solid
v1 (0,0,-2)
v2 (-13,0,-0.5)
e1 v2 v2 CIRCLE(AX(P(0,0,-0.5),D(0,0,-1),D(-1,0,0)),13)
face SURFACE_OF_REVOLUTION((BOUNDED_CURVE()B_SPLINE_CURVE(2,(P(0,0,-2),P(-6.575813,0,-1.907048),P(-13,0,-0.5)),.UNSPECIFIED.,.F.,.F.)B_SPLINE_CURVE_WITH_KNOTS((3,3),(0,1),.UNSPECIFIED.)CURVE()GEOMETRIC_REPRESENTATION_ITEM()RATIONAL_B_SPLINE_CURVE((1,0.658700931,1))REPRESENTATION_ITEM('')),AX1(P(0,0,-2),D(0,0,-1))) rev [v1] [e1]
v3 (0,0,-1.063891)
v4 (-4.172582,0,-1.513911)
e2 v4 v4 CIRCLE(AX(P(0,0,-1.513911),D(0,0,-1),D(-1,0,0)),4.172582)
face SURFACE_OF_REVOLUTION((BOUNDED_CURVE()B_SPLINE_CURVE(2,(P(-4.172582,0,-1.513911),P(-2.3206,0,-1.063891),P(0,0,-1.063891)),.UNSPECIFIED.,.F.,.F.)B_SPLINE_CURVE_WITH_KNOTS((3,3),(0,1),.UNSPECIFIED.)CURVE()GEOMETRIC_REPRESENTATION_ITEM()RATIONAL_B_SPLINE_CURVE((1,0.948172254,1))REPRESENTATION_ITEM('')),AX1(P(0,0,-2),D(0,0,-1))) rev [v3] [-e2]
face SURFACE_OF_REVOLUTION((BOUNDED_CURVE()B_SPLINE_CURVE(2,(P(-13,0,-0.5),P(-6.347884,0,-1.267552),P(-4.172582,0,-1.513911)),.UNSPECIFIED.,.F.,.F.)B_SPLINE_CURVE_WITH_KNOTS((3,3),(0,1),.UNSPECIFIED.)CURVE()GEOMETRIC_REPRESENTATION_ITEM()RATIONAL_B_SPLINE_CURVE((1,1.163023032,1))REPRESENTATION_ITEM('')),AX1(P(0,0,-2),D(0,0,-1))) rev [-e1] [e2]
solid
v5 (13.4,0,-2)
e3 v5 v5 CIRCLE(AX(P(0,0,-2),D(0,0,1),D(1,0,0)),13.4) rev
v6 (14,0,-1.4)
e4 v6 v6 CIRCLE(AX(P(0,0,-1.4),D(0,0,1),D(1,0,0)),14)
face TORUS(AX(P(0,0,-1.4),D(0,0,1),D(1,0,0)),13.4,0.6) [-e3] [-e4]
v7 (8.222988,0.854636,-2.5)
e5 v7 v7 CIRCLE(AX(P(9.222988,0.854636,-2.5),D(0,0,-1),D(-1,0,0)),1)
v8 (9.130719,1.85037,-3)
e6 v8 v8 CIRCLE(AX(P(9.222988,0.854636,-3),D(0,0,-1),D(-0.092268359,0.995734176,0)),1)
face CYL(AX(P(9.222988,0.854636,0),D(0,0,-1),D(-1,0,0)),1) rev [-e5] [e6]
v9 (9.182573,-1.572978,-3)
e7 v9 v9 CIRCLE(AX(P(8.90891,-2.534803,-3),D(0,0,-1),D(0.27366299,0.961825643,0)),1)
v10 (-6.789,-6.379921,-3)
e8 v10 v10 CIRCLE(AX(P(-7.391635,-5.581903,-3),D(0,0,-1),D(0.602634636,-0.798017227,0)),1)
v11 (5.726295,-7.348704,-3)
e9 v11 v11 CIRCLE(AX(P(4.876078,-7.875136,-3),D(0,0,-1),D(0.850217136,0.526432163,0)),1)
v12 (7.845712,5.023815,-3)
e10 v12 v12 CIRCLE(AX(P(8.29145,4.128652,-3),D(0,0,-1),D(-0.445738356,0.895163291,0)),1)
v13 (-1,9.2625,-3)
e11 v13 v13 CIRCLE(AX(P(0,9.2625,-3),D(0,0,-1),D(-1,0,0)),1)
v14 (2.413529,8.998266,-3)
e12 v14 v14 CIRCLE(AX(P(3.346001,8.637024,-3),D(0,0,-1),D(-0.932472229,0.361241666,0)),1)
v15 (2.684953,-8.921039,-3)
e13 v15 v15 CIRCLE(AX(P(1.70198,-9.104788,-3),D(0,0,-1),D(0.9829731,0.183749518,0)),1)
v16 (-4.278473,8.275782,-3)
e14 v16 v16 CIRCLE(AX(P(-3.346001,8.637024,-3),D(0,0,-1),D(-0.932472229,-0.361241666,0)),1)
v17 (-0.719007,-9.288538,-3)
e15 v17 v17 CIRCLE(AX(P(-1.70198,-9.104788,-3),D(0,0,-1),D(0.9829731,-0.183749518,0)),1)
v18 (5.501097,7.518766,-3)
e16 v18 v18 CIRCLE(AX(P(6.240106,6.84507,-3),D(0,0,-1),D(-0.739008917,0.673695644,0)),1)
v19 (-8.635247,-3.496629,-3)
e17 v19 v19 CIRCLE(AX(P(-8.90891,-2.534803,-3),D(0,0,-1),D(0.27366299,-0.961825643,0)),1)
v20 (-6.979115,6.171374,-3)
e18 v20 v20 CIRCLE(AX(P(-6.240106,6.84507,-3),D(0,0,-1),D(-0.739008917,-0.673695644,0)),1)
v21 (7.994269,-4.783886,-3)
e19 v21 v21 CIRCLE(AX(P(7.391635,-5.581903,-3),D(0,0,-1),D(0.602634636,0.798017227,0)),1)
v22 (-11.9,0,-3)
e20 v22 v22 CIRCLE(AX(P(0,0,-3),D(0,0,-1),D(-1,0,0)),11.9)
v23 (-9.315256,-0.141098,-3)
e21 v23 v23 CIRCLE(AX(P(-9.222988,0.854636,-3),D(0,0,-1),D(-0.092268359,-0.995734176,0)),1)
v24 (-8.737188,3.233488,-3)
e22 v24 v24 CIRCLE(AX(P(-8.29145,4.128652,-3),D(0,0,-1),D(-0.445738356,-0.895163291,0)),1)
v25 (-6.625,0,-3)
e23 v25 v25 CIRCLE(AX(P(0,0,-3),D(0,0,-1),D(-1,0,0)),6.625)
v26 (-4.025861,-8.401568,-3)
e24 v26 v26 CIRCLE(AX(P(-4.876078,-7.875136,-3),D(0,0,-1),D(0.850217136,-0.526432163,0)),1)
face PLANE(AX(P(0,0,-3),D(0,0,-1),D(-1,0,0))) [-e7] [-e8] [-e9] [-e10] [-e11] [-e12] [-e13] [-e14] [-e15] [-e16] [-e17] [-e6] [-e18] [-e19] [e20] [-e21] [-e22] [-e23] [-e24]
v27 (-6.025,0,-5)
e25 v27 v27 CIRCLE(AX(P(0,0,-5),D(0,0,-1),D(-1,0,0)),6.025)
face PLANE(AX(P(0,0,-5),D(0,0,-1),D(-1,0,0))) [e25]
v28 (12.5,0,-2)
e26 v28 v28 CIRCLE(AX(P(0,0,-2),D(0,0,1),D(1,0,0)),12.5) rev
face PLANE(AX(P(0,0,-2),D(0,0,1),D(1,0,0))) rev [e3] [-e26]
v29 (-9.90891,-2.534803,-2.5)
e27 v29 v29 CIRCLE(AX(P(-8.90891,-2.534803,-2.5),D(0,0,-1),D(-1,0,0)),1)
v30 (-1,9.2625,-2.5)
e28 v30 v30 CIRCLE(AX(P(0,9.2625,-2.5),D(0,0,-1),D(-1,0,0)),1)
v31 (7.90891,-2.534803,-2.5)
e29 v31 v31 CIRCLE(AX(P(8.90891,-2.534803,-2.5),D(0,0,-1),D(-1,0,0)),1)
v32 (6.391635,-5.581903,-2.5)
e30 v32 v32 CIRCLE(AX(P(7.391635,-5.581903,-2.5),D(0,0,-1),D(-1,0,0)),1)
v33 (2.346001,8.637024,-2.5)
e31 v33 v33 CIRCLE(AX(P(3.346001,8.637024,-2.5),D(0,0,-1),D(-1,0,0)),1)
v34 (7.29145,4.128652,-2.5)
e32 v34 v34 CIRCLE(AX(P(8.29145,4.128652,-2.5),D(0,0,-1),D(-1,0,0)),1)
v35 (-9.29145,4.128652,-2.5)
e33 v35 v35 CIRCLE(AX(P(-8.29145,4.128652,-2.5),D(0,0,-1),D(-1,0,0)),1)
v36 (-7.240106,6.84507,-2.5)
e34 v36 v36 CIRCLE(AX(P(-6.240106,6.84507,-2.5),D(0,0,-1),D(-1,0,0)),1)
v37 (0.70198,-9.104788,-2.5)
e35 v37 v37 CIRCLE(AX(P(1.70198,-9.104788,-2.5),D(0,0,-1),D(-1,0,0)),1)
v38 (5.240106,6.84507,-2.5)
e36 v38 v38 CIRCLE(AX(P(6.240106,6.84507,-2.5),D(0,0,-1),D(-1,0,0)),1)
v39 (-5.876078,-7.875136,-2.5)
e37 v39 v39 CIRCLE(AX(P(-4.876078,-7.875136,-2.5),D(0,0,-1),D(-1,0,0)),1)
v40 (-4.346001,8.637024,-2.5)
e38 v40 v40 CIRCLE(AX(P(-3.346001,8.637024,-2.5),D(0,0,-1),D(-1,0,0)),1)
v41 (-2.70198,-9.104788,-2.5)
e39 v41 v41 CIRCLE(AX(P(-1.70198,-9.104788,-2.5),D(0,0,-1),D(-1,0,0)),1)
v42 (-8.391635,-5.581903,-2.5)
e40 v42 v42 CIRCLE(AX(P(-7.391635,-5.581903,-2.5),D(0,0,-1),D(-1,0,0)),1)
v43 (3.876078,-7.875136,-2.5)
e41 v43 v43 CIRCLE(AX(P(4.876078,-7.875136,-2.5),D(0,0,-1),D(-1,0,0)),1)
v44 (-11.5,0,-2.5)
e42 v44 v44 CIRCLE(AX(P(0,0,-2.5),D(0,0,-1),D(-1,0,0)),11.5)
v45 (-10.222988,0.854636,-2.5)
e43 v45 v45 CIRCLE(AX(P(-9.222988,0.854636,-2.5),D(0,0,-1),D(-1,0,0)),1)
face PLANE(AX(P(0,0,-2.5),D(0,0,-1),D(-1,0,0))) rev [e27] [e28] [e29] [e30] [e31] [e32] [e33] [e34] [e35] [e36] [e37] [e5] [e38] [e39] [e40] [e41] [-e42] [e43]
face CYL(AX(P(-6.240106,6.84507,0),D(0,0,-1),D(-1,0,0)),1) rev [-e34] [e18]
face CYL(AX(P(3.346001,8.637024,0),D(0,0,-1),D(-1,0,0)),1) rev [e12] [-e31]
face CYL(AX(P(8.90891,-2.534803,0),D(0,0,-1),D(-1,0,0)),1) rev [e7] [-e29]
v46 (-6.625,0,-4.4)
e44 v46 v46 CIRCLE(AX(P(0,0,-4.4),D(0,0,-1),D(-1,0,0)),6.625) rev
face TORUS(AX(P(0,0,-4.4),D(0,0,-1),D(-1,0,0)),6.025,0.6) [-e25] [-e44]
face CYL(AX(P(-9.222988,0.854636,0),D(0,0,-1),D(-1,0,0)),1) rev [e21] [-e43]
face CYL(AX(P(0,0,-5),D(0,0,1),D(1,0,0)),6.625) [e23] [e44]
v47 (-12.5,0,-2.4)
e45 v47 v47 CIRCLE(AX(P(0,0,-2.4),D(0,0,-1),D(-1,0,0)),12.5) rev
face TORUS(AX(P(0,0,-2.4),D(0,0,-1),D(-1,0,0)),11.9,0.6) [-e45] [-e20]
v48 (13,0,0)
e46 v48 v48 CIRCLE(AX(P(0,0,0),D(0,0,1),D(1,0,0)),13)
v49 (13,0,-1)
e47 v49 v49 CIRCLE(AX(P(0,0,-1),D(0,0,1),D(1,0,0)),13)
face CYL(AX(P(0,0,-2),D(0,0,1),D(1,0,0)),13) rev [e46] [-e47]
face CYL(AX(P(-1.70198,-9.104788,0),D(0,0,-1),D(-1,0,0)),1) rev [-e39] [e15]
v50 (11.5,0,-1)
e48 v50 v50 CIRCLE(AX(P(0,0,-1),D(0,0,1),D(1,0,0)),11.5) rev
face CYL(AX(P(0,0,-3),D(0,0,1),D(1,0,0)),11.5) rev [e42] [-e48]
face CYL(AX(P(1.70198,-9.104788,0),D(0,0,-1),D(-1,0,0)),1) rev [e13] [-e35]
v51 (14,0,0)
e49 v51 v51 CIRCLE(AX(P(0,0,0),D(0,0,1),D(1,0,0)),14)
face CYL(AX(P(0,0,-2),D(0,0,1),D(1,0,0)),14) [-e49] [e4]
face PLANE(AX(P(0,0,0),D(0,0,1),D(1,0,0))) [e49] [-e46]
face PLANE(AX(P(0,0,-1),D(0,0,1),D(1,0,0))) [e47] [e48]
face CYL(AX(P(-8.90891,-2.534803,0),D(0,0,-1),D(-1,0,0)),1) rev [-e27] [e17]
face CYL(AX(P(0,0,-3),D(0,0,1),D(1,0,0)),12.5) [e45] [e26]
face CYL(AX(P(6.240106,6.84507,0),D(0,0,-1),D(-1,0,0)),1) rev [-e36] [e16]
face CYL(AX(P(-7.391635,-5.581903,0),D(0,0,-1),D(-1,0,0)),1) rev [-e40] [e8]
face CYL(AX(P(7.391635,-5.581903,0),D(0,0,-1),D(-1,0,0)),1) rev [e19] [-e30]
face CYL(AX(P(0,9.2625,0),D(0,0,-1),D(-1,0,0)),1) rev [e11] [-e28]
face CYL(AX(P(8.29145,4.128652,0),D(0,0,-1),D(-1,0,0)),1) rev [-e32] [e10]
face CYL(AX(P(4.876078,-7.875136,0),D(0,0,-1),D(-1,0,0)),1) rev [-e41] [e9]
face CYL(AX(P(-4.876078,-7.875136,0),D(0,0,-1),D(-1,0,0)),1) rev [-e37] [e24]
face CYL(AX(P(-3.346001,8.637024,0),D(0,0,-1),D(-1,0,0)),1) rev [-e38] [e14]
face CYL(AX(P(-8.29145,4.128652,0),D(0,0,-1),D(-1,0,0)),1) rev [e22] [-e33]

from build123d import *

# Parameters (mm, degrees)
SKETCH1_R            = 14
BOSS_EXTRUDE1_DEPTH  = 2
SKETCH3_R            = 12.5
BOSS_EXTRUDE3_DEPTH  = 1
FILLET1_R            = 0.6
FILLET2_R            = 0.6
SHELL1_START         = -2.5
SHELL1_OUTLINE_R     = 11.5
SHELL1_DEPTH         = 2.5
SHELL1_START_2       = -1
SHELL1_2_OUTLINE_R   = 13
SHELL1_2_OUTLINE_R_2 = 11.5
SHELL1_2_DEPTH       = 1
SKETCH4_R            = 6.625
BOSS_EXTRUDE4_DEPTH  = 2
FILLET3_R            = 0.6
SKETCH5_R            = 1
CUT_EXTRUDE1_DEPTH   = 21.024984534
CIRPATTERN1_COUNT    = 17


# Read off the part's stored shape, not the designer's step: Shell1
with BuildPart() as part:
    # Sketch1 → Boss-Extrude1 (new body)
    with BuildSketch(Plane.XY):
        Circle(SKETCH1_R)
    extrude(amount=-BOSS_EXTRUDE1_DEPTH)

    # Sketch3 → Boss-Extrude3 (add)
    with BuildSketch(Plane(origin=(0, 0, -2), x_dir=(-1, 0, 0), z_dir=(0, 0, -1))):
        with Locations(Location((0, 0, 0), (0, 0, 180))):
            Circle(SKETCH3_R)
    extrude(amount=BOSS_EXTRUDE3_DEPTH)

    # Fillet1
    fillet1_edges = [part.edges().sort_by_distance(p)[0] for p in [
        (-14, 0, -2),
    ]]
    fillet(fillet1_edges, radius=FILLET1_R)

    # Fillet2
    fillet2_edges = [part.edges().sort_by_distance(p)[0] for p in [
        (-12.5, 0, -3),
    ]]
    fillet(fillet2_edges, radius=FILLET2_R)

    # Shell1 outline → Shell1 (cut)
    with BuildSketch(Plane.XY.offset(SHELL1_START)):
        Circle(SHELL1_OUTLINE_R)
    extrude(amount=SHELL1_DEPTH, mode=Mode.SUBTRACT)

    # Shell1 2 outline → Shell1 2 (cut)
    with BuildSketch(Plane.XY.offset(SHELL1_START_2)):
        Circle(SHELL1_2_OUTLINE_R)
        Circle(SHELL1_2_OUTLINE_R_2, mode=Mode.SUBTRACT)
    extrude(amount=SHELL1_2_DEPTH, mode=Mode.SUBTRACT)

    # Sketch4 → Boss-Extrude4 (add)
    with BuildSketch(Plane(origin=(0, 0, -3), x_dir=(-1, 0, 0), z_dir=(0, 0, -1))):
        Circle(SKETCH4_R)
    extrude(amount=BOSS_EXTRUDE4_DEPTH)

    # Fillet3
    fillet3_edges = [part.edges().sort_by_distance(p)[0] for p in [
        (6.625, 0, -5),
    ]]
    fillet(fillet3_edges, radius=FILLET3_R)

    # Sketch5 → Cut-Extrude1 (cut, through all)
    with BuildSketch(Plane(origin=(0, 0, -3), x_dir=(-1, 0, 0), z_dir=(0, 0, -1))):
        with Locations((0, 9.2625)):
            Circle(SKETCH5_R)
    cut_extrude1 = extrude(amount=-CUT_EXTRUDE1_DEPTH, mode=Mode.SUBTRACT)

    # CirPattern1: Cut-Extrude1 ×17 about axis
    cirpattern1_axis = Axis((0, 0, 0), (0, 0, 1))
    for i in range(1, CIRPATTERN1_COUNT):
        add(cut_extrude1.rotate(cirpattern1_axis, i * 360 / CIRPATTERN1_COUNT), mode=Mode.SUBTRACT)


with BuildPart() as body_2:
    # Sketch7 → Revolve2 (revolve)
    with BuildSketch(Plane(origin=(0, 0, 0), x_dir=(1, 0, 0), z_dir=(0, 1, 0))):
        with BuildLine():
            Line((0, 2), (0, 1.06389143))
            add(Edge.make_bspline(
                [(-4.172581723, 1.513911328), (-2.320600441, 1.06389143), (0, 1.06389143)],
                knots=[0, 0, 0, 1, 1, 1], degree=2, weights=[1, 0.948172254, 1]))
            add(Edge.make_bspline(
                [(-13, 0.5), (-6.347883769, 1.267551873), (-4.172581723, 1.513911328)],
                knots=[0, 0, 0, 1, 1, 1], degree=2, weights=[1, 1.163023032, 1]))
            add(Edge.make_bspline(
                [(0, 2), (-6.575813225, 1.907047951), (-13, 0.5)],
                knots=[0, 0, 0, 1, 1, 1], degree=2, weights=[1, 0.658700931, 1]))
        make_face()
    revolve(axis=Axis((0, 0, -2), (0, 0, 1)))


solid = Compound([part.part, body_2.part])
